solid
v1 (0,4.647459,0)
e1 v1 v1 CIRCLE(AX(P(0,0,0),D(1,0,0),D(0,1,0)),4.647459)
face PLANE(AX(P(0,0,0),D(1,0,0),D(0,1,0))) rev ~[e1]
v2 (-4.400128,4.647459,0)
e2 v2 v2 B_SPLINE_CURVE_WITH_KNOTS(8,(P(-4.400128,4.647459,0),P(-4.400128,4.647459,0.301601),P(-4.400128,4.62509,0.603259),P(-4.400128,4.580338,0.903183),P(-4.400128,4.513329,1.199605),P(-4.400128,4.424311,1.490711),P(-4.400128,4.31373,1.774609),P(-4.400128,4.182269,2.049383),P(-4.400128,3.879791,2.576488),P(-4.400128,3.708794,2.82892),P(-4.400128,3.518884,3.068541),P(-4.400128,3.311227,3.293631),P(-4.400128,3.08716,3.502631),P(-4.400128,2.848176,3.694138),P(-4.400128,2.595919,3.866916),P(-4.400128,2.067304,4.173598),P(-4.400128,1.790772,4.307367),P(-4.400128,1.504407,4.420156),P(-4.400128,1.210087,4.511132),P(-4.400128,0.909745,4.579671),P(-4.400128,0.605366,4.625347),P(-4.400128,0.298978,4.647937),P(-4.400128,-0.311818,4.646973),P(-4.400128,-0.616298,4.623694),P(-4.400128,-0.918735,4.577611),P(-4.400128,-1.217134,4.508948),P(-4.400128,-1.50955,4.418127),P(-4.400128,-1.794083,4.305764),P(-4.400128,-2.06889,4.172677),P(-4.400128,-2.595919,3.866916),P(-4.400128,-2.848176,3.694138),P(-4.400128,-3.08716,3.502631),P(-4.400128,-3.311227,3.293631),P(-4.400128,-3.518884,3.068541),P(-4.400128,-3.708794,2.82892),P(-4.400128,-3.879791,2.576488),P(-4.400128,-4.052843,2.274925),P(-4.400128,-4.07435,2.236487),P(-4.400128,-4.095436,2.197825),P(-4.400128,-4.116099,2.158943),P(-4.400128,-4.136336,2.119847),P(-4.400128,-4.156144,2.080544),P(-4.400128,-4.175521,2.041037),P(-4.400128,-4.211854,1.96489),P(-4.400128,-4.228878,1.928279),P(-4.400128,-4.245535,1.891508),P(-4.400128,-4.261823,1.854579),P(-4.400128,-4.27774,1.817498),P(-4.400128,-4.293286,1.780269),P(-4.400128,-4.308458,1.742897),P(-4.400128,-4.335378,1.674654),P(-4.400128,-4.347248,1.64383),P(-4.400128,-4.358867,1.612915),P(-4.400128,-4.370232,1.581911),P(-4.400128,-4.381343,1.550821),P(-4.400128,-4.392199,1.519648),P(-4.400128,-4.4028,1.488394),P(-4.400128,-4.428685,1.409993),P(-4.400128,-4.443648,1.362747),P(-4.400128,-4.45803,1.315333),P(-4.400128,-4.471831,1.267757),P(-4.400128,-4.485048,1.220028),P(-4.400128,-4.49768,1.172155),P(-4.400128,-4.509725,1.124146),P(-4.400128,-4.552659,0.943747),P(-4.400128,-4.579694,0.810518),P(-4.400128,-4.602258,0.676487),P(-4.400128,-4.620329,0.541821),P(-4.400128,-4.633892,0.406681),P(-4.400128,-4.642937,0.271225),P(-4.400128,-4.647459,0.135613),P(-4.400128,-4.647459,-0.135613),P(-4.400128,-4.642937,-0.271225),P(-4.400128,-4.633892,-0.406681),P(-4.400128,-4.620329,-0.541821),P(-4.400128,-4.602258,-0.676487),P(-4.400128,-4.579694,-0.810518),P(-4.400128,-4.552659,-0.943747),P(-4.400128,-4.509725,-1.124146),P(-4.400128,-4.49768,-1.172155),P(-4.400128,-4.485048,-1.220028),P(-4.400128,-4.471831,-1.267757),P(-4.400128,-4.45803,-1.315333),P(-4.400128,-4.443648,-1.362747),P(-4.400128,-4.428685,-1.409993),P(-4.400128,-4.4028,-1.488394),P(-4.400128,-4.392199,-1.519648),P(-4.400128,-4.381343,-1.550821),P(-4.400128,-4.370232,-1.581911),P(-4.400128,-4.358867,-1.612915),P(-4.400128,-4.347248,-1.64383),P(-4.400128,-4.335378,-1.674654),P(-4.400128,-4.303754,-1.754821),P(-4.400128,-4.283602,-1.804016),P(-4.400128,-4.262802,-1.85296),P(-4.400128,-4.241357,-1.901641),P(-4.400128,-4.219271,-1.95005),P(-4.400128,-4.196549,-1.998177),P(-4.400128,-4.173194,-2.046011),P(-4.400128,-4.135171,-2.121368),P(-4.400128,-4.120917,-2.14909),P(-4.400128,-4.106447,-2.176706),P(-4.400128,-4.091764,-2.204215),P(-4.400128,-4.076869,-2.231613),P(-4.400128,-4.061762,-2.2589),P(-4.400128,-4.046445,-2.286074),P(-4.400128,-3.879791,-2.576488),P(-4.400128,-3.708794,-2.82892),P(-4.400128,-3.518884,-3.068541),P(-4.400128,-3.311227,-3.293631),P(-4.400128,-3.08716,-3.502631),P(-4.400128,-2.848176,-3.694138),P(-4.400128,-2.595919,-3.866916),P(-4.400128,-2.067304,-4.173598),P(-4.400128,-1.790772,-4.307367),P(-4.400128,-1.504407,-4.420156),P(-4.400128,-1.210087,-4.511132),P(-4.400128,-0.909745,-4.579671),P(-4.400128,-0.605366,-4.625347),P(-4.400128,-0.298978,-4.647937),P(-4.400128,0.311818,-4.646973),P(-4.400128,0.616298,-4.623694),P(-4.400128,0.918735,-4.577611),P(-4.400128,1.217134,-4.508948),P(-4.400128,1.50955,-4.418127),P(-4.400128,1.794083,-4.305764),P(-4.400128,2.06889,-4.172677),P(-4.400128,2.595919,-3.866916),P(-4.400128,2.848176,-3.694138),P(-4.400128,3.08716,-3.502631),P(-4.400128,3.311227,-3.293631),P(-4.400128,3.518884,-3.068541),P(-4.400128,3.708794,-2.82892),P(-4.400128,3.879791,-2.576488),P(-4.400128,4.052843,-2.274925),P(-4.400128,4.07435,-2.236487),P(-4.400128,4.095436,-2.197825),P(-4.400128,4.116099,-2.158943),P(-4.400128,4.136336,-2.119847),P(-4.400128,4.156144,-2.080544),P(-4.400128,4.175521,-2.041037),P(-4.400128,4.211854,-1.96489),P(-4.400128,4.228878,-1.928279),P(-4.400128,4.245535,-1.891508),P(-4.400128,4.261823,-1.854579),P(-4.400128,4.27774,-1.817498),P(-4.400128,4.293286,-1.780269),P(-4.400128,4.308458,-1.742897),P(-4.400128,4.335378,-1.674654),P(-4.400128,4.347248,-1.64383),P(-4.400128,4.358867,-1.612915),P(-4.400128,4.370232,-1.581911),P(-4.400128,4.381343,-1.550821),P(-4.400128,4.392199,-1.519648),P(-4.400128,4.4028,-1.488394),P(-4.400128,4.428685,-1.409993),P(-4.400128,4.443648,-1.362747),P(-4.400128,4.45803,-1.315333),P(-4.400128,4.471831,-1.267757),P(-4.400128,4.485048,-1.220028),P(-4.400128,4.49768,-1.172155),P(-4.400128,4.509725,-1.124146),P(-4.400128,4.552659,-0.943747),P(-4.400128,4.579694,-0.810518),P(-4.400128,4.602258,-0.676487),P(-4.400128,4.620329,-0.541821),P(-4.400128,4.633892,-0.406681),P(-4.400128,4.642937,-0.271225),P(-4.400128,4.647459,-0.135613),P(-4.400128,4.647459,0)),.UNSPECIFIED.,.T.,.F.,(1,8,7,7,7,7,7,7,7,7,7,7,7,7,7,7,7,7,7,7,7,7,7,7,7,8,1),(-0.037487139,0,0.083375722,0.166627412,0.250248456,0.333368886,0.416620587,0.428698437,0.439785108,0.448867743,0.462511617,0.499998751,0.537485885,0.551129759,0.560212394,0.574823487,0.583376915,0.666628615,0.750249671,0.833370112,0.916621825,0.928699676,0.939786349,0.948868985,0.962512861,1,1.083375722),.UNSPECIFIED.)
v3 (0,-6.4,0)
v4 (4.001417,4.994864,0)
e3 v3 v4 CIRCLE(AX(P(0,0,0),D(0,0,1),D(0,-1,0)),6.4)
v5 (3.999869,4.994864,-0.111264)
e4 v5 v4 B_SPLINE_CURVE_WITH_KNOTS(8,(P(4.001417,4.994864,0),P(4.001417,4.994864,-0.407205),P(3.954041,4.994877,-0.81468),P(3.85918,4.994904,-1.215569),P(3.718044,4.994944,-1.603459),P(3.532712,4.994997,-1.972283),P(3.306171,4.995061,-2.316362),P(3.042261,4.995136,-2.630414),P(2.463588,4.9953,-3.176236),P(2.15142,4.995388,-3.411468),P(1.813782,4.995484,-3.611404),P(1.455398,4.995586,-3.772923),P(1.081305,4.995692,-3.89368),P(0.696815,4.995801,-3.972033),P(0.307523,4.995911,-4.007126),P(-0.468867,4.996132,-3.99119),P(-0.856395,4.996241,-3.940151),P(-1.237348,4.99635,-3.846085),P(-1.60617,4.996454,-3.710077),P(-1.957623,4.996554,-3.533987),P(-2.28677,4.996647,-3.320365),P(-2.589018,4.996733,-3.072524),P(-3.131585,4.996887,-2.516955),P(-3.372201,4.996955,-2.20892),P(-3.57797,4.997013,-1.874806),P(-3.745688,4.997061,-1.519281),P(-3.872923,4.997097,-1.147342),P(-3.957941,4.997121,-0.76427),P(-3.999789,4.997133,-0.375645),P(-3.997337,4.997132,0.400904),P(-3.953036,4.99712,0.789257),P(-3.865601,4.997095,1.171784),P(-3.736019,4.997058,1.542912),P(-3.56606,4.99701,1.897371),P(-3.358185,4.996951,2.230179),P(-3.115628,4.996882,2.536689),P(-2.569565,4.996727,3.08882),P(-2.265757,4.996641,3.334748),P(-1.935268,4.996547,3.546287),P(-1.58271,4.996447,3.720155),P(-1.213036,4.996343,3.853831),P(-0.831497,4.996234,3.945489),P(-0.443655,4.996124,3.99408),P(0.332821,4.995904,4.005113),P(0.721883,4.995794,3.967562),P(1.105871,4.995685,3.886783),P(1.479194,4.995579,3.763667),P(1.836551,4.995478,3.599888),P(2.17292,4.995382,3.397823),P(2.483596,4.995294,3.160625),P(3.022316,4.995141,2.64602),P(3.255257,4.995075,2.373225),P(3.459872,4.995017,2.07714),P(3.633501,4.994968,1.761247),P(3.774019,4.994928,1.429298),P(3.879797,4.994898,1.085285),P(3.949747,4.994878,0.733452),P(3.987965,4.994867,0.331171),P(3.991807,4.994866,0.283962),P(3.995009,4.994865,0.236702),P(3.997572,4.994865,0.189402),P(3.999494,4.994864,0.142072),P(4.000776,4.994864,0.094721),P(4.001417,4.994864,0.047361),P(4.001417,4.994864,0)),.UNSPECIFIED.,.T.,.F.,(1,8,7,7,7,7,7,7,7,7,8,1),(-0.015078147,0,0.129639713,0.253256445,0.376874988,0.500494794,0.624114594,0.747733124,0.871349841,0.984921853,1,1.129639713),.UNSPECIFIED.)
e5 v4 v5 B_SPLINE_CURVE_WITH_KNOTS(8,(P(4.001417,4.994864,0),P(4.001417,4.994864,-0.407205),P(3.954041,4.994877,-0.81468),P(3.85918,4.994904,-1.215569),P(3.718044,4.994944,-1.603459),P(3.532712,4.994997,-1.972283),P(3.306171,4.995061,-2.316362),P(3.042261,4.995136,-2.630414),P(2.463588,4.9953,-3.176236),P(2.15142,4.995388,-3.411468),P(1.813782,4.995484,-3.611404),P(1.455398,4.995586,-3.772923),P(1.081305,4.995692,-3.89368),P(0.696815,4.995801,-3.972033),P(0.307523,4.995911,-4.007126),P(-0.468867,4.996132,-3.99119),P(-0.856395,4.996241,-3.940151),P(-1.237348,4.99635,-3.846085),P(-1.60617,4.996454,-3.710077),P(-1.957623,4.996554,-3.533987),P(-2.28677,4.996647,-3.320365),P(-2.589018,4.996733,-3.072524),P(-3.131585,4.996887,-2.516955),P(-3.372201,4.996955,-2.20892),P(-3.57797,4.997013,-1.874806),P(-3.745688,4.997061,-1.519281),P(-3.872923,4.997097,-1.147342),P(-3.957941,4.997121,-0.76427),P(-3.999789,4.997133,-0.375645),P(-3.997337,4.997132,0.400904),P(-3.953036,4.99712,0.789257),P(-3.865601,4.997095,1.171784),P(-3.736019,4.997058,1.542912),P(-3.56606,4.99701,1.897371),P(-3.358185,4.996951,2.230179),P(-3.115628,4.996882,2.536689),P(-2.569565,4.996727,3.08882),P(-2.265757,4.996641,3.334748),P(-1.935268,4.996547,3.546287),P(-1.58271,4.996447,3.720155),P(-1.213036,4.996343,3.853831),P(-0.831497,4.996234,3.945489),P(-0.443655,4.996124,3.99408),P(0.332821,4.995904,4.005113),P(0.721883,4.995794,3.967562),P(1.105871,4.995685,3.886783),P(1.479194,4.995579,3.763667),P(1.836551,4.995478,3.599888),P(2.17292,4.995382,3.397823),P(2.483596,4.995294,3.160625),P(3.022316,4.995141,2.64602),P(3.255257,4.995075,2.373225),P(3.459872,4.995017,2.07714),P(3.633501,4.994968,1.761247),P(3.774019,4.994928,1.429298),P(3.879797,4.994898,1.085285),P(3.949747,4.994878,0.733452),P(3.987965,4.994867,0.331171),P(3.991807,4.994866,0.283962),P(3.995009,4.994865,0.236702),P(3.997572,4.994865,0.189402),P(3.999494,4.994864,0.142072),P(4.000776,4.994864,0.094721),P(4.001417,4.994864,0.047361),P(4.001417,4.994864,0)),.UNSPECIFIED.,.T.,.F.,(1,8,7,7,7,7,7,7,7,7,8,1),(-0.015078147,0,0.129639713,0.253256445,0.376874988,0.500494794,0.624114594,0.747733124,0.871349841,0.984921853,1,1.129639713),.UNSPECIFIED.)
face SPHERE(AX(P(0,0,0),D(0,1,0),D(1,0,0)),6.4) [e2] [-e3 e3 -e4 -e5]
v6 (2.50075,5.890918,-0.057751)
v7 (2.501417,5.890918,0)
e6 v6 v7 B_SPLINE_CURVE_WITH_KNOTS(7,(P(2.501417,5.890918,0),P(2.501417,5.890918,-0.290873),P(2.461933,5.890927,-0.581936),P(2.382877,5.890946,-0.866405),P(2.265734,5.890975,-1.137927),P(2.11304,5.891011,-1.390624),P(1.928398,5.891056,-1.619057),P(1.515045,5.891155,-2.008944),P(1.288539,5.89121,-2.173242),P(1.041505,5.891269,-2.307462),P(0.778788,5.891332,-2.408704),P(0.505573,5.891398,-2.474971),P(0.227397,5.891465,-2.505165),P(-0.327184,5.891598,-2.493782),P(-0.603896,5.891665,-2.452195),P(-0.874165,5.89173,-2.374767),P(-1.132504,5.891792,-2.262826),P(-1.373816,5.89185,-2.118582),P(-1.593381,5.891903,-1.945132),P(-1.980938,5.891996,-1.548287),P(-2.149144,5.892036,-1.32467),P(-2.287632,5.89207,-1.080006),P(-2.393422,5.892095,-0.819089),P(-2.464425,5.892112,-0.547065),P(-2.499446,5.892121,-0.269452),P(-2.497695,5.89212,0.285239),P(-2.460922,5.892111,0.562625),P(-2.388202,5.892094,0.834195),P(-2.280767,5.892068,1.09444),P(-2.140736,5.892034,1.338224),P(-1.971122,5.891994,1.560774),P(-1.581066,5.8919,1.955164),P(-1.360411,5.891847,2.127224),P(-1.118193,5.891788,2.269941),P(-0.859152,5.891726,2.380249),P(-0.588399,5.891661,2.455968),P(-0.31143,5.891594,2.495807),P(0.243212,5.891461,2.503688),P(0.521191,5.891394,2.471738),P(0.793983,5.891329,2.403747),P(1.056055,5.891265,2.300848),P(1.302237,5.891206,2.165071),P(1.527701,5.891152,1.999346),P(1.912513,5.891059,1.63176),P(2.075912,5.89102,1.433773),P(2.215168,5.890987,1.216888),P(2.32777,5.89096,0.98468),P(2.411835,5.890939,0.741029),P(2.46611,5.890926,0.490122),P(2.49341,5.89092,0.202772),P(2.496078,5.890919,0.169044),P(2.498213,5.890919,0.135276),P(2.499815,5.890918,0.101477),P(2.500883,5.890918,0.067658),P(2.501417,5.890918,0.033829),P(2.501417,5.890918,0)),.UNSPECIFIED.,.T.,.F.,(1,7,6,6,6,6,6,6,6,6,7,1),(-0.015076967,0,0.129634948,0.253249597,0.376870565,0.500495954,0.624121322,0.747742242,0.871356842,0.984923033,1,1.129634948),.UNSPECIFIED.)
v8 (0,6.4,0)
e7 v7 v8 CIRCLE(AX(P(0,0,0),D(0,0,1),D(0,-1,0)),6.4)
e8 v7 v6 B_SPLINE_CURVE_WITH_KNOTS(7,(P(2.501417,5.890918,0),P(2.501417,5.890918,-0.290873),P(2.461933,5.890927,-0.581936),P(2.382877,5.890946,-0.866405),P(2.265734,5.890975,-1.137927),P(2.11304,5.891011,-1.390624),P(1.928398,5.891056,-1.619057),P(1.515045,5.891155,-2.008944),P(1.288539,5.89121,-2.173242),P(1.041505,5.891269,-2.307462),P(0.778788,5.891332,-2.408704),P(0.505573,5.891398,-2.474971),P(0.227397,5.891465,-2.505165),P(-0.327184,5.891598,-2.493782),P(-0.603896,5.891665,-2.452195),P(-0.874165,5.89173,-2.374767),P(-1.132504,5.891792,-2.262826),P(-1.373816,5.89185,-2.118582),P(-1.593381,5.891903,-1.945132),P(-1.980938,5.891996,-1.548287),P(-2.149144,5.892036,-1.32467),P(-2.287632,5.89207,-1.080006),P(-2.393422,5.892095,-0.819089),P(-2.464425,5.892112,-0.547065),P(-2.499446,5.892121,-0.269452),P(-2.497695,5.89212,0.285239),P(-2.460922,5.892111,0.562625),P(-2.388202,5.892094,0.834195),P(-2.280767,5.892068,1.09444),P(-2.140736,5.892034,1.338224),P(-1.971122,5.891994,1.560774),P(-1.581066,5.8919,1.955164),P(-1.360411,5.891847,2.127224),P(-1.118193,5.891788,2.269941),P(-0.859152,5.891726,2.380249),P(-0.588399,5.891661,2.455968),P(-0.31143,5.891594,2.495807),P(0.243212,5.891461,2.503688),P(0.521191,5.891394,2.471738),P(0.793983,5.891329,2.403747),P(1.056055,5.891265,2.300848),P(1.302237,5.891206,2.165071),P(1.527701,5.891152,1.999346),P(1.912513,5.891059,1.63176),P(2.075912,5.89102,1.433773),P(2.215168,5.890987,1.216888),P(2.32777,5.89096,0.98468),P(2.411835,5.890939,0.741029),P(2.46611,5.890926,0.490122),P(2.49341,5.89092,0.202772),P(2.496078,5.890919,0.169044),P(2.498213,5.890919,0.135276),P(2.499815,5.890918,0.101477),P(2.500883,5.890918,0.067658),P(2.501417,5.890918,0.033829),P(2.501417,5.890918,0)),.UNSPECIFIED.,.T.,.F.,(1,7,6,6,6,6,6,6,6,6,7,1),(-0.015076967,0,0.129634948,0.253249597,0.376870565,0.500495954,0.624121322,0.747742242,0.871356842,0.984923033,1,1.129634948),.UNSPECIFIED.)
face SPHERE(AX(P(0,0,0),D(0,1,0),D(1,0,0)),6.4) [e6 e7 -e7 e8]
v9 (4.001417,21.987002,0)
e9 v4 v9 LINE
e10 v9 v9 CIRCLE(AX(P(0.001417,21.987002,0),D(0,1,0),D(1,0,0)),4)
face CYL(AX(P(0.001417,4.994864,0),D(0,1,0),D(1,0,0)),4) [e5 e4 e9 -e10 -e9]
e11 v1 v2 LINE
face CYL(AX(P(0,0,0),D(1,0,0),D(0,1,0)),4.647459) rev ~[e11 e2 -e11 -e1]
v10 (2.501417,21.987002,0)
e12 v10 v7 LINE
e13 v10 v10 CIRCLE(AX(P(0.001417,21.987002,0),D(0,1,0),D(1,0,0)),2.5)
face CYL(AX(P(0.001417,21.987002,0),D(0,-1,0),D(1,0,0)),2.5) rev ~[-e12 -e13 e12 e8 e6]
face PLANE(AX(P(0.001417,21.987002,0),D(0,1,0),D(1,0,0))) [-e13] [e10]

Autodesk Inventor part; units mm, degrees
ref_plane "YZ Plane" through (0, 0, 0) normal (1, 0, 0) x (0, 1, 0)
ref_plane "XZ Plane" through (0, 0, 0) normal (0, 1, 0) x (-1, 0, 0)
ref_plane "XY Plane" through (0, 0, 0) normal (0, 0, 1) x (1, 0, 0)
sketch "스케치1" plane through (0, 0, 0) normal (0, 0, 1) x (1, 0, 0)
  circle A0 centre (0, 0) radius 6.4
  line L0 (0, 6.4) -> (0, -6.4)
  dimension "d0" = 12.8
sketch "스케치1 outline for SR sphere" plane through (0, 0, 0) normal (0, 0, 1) x (1, 0, 0)
  line L0 (0, 6.4) -> (0, -6.4)
  arc A0 (0, -6.4) -> (0, 6.4) centre (0, 0) ccw
revolve "SR sphere" add sketch "스케치1 outline for SR sphere" angle 360 about axis through (0, 6.4, 0) along (0, -1, 0)
sketch "e" plane through (0, 0, 0) normal (1, 0, 0) x (0, 1, 0)
  circle A0 centre (0, 0) radius 4.647459
sketch "e outline for e hole" plane through (0, 0, 0) normal (1, 0, 0) x (0, 1, 0)
  circle A0 centre (0, 0) radius 4.647459
extrude "e hole" cut sketch "e outline for e hole" against normal blind 6.4
sketch "스케치6" plane through (0, 0, 0) normal (0, 0, 1) x (1, 0, 0)
  arc A0 (-4.400128, -4.647459) -> (-4.400128, 4.647459) centre (0, 0) ccw
  line L0 (4.001417, 4.994864) -> (4.001417, 21.987002)
  line L1 (4.001417, 21.987002) -> (2.501417, 21.987002)
  line L2 (2.501417, 21.987002) -> (2.501417, 5.890918)
  line L3 (0.001417, -6.4) -> (0.001417, 19.355985)
  line L4 (10.301781, -0.012998) -> (-6.695287, -0.012998)
  line L5 (4.001417, 4.994864) -> (2.501417, 5.890918)
  point P0 (3.251417, 21.987002)
  dimension "d4" = 1.5
  dimension "d5" = 4
  dimension "d6" = 22
sketch "스케치6 outline for h, g 고려 회전" plane through (0, 0, 0) normal (0, 0, 1) x (1, 0, 0)
  line L0 (4.001417, 21.987002) -> (2.501417, 21.987002)
  line L1 (4.001417, 4.994864) -> (4.001417, 21.987002)
  arc A0 (2.501417, 5.890918) -> (4.001417, 4.994864) centre (0, 0) cw
  line L2 (2.501417, 21.987002) -> (2.501417, 5.890918)
revolve "h, g 고려 회전" add sketch "스케치6 outline for h, g 고려 회전" angle 360 about axis through (0.001417, -6.4, 0) along (0, 1, 0)
properties part number "Ball Joint_bot"
